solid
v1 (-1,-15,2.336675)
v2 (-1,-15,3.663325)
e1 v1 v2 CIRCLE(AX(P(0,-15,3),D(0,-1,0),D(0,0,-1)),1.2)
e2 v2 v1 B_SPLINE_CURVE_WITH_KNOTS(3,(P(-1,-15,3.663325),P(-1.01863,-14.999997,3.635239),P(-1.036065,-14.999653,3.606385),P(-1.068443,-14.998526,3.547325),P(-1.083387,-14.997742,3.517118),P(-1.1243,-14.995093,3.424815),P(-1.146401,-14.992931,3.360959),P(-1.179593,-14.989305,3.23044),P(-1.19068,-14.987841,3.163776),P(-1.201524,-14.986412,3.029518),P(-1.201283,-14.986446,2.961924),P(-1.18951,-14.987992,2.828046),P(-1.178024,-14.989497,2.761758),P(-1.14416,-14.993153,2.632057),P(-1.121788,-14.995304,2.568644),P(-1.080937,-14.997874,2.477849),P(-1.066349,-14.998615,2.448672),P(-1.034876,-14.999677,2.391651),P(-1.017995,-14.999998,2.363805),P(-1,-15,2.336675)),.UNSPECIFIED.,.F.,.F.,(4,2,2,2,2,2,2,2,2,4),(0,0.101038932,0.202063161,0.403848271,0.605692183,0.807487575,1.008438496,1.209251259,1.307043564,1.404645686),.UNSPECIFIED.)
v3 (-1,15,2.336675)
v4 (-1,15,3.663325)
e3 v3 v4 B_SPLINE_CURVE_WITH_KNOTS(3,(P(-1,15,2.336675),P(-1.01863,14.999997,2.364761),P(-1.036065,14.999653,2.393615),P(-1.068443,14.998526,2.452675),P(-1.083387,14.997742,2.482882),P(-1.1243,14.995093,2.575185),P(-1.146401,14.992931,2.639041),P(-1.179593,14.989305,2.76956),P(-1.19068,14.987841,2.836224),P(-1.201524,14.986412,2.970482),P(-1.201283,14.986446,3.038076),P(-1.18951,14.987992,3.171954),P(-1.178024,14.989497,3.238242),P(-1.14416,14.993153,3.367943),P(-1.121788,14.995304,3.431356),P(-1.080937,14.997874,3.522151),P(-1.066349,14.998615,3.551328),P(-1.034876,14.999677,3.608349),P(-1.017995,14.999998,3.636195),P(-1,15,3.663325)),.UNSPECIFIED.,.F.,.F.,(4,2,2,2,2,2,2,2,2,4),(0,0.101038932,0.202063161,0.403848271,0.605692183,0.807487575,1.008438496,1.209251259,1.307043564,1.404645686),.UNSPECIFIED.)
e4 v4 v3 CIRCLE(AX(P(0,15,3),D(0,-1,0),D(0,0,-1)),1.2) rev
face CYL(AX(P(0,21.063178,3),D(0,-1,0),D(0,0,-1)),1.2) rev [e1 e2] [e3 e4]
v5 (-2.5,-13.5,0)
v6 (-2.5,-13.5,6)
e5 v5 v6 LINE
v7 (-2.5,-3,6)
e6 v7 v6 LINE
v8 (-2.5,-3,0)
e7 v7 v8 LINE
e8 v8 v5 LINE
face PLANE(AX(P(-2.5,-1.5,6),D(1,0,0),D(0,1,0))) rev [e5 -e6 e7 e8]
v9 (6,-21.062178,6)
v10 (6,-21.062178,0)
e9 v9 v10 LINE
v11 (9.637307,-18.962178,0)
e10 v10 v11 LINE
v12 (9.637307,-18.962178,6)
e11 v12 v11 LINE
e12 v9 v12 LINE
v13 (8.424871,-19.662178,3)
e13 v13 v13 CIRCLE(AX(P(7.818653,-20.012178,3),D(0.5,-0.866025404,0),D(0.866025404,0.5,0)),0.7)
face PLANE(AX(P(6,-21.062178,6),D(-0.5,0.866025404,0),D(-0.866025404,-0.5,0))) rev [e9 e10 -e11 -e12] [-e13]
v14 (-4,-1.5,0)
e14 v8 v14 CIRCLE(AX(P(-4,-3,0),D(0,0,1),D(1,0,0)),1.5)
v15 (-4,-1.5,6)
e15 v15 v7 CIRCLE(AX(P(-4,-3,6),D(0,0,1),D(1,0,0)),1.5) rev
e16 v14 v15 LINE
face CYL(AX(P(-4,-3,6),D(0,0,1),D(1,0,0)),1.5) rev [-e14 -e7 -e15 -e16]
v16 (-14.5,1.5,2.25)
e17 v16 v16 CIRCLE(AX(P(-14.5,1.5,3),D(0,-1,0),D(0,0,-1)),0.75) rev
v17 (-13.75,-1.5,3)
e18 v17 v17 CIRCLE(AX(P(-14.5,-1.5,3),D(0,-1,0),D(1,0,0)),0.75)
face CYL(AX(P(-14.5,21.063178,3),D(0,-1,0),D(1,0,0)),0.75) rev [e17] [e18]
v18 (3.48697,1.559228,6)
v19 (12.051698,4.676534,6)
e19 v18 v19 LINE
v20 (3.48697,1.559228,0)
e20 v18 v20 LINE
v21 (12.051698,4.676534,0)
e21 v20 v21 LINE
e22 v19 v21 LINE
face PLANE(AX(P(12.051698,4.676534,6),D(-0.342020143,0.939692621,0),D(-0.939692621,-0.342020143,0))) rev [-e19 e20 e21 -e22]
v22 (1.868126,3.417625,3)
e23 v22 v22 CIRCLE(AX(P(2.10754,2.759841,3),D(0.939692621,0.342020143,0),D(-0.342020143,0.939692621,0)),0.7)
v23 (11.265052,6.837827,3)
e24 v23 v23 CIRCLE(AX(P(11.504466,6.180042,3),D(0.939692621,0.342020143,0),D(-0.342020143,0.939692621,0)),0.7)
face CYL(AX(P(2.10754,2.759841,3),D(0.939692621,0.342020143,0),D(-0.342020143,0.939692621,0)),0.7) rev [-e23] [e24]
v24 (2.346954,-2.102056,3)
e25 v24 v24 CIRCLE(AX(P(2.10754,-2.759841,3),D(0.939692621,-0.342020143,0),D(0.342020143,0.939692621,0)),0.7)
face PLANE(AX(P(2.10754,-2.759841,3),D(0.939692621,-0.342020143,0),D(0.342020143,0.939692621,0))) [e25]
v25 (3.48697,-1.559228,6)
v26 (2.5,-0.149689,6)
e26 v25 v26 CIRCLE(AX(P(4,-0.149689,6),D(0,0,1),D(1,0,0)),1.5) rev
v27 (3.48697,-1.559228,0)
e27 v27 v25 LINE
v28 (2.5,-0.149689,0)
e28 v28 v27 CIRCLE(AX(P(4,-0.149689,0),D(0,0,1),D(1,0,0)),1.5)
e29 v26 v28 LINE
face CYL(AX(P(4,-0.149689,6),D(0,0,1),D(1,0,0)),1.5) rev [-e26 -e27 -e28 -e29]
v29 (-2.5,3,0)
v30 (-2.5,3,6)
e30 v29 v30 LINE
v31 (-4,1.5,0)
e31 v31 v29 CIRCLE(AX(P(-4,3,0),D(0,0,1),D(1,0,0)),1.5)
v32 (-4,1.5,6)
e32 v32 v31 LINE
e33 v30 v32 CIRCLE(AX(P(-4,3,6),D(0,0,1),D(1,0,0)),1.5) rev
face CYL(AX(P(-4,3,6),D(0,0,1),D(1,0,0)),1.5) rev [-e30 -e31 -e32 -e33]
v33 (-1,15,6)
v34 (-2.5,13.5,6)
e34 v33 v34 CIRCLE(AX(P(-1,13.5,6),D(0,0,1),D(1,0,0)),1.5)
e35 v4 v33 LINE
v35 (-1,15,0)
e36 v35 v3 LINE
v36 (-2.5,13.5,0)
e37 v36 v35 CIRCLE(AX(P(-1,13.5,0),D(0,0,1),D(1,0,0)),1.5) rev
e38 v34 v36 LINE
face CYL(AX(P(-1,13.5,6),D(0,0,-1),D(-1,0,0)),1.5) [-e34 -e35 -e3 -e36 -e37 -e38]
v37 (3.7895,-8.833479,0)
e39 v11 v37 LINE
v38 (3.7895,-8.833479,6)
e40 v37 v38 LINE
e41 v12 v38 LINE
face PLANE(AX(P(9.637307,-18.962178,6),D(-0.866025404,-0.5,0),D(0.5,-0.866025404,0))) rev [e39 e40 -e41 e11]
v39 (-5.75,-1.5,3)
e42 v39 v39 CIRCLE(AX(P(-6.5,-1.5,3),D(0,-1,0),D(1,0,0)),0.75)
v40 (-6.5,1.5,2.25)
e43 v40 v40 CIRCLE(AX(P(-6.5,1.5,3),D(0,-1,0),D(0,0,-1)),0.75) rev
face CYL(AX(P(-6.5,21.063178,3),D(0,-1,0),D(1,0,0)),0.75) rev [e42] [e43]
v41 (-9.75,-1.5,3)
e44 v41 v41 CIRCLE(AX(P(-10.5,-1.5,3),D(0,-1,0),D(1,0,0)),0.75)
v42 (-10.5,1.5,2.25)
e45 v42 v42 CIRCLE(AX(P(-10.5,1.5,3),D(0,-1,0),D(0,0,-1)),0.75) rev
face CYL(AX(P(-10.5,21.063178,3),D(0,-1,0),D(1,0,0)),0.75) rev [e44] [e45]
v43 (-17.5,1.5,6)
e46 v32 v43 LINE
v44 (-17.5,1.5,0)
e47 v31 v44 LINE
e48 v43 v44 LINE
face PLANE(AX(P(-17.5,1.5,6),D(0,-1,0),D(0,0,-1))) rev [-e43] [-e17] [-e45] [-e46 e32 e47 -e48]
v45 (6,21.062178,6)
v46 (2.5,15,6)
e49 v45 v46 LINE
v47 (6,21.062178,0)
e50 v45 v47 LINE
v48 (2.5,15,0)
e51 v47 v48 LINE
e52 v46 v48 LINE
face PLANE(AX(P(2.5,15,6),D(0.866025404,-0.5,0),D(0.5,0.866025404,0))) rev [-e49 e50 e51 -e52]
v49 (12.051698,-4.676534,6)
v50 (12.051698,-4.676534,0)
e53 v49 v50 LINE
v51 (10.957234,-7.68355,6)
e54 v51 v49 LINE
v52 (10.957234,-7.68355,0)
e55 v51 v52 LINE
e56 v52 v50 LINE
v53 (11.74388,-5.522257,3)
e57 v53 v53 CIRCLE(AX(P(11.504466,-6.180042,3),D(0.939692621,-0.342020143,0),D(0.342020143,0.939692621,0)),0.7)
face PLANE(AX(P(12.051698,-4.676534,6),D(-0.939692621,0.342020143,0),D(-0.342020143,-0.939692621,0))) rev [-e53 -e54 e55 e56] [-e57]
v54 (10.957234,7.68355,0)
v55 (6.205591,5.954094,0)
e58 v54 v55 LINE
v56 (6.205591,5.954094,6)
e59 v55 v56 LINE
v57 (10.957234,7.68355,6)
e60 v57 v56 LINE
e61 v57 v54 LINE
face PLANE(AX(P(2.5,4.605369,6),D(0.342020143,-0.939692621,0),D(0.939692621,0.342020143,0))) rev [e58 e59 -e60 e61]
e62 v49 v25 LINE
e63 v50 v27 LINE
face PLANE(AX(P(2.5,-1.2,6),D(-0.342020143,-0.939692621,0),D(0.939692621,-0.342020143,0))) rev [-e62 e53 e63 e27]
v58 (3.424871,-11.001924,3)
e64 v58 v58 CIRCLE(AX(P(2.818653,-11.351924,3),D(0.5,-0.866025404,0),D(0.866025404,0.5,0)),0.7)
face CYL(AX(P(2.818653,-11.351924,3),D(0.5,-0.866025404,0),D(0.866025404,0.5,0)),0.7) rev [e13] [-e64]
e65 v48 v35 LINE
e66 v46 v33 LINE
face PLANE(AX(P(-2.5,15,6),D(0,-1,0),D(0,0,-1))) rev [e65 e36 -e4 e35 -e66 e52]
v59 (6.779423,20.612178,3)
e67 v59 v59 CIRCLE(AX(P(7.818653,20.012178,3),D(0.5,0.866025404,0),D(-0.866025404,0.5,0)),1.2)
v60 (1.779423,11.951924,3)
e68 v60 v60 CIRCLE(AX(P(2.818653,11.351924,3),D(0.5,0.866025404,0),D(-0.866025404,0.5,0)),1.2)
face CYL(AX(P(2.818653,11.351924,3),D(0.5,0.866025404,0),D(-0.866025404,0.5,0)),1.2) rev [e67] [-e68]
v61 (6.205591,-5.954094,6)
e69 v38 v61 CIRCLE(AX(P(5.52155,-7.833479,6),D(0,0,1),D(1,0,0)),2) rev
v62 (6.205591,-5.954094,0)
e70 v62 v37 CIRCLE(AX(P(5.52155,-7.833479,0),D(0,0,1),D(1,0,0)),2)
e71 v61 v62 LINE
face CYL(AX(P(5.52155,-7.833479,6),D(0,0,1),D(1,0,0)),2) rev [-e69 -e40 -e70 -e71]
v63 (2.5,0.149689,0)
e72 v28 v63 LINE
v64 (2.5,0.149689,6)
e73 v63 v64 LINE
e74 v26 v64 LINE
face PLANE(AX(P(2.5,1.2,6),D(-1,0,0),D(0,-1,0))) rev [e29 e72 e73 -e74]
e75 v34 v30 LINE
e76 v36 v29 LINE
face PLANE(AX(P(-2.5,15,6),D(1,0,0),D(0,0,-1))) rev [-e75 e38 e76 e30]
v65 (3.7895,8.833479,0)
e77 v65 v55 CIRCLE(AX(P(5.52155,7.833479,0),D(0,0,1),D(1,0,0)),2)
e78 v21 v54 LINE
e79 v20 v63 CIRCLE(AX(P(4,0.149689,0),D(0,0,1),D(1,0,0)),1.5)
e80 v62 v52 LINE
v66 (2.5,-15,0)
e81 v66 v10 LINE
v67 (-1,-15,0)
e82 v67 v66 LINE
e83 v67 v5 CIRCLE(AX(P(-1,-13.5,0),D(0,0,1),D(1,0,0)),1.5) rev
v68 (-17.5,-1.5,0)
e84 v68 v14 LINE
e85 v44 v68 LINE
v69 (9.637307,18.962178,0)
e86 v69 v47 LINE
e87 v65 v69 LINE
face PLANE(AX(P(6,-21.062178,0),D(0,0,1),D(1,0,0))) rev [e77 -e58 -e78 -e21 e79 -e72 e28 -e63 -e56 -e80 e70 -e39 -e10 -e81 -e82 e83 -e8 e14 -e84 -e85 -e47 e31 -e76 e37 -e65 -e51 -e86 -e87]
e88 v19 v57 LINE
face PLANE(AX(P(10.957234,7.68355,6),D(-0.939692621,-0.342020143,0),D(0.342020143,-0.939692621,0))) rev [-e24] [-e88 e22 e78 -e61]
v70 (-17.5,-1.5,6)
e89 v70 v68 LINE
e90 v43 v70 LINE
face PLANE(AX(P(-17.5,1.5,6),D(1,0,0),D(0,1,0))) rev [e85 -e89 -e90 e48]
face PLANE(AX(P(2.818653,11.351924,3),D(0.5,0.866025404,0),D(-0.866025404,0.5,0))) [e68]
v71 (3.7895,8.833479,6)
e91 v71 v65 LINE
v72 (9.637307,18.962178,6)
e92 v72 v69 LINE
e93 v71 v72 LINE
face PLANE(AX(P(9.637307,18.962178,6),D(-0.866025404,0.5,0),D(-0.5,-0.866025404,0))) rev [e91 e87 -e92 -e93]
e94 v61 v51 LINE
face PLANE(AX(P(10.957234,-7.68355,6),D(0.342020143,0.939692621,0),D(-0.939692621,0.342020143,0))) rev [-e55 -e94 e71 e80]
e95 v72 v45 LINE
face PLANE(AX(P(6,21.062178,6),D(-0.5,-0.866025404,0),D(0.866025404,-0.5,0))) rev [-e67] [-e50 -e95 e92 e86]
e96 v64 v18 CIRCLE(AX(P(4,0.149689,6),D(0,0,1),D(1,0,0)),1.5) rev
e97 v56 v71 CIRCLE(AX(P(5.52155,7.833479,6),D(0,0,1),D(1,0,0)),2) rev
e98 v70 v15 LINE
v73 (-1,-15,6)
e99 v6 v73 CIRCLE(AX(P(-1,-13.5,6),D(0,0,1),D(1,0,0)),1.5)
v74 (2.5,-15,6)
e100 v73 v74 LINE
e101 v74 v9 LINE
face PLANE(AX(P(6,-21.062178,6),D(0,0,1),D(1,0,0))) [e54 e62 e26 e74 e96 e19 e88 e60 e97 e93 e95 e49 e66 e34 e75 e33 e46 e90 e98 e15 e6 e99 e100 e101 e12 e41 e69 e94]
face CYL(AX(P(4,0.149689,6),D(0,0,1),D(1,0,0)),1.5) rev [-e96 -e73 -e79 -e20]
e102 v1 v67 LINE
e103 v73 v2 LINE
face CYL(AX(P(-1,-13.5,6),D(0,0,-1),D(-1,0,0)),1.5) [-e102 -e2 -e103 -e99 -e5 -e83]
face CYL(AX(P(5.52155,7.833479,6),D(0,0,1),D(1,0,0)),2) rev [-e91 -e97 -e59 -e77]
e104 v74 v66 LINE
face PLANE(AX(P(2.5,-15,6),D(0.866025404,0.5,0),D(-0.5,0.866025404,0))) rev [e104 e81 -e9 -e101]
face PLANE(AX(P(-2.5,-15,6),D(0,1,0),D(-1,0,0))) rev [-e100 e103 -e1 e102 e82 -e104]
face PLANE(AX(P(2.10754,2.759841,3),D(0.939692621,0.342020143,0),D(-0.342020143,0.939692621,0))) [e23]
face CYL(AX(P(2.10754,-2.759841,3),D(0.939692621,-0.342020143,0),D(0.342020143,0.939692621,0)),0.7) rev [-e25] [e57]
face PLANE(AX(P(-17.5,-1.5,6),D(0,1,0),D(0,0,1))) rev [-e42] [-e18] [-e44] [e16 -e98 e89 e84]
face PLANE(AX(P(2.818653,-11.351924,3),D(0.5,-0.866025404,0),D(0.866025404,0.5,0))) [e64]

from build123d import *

# Parameters (mm, degrees)
EXTRUDE_1_DEPTH      = 6
FILLET_4_R           = 1.5
FILLET_5_R           = 2
SKETCH_7_R           = 1.2
CUT_EXTRUDE_6_DEPTH  = 10
SKETCH_8_R           = 0.7
CUT_EXTRUDE_7_DEPTH  = 10
SKETCH_9_R           = 0.7
CUT_EXTRUDE_8_DEPTH  = 10
SKETCH_10_R          = 0.7
CUT_EXTRUDE_9_DEPTH  = 10
CUT_EXTRUDE_10_REACH = 42.531
SKETCH_11_R          = 1.2
FILLET_6_R           = 1.5
CUT_EXTRUDE_11_REACH = 31.177
SKETCH_12_R          = 0.75


with BuildPart() as part:
    # 草圖1 → 填料-伸長1 (new body)
    with BuildSketch(Plane.XY):
        Polygon((-2.5, 15), (2.5, 15), (6, 21.062177826), (9.637306696, 18.962177826), (2.5, 6.6), (2.5, 4.605368872), (10.957233587, 7.683550162), (12.051698046, 4.676533775), (2.5, 1.2), (2.5, -1.2), (12.051698046, -4.676533775), (10.957233587, -7.683550162), (2.5, -4.605368872), (2.5, -6.6), (9.637306696, -18.962177826), (6, -21.062177826), (2.5, -15), (-2.5, -15), (-2.5, -1.5), (-17.5, -1.5), (-17.5, 1.5), (-2.5, 1.5), align=None)
    extrude(amount=EXTRUDE_1_DEPTH)

    # 圓角4
    # the kernel refuses this fillet: 1.5 mm, written as the material it adds along each edge
    with BuildSketch(Plane(origin=(-2.5, -1.5, 0), x_dir=(0, -1, 0), z_dir=(0, 0, 1)), Plane(origin=(-2.5, 1.5, 0), x_dir=(-1, 0, 0), z_dir=(0, 0, 1))) as fillet_4_piece_1:
        with BuildLine():
            CenterArc((FILLET_4_R, -FILLET_4_R), FILLET_4_R, 90, 90)
            Line((0, -FILLET_4_R), (-FILLET_4_R * 0.02, -FILLET_4_R))
            Line((-FILLET_4_R * 0.02, -FILLET_4_R), (-FILLET_4_R * 0.02, FILLET_4_R * 0.02))
            Line((-FILLET_4_R * 0.02, FILLET_4_R * 0.02), (FILLET_4_R, FILLET_4_R * 0.02))
            Line((FILLET_4_R, FILLET_4_R * 0.02), (FILLET_4_R, 0))
        make_face()
    extrude(amount=6)
    with BuildSketch(Plane(origin=(2.5, 4.605368872, 0), x_dir=(0, 1, 0), z_dir=(0, 0, 1))) as fillet_4_piece_2:
        with BuildLine():
            CenterArc((2.139664035, -1.492972021), FILLET_4_R, 95.548517206, 104.451482794)
            Line((0.730125104, -2.006002236), (0.701934325, -2.01626284))
            Line((0.701934325, -2.01626284), (-0.028190779, -0.010260604))
            Line((-0.028190779, -0.010260604), (0, 0.03))
            ThreePointArc((0, 0.03), (0.997315564, 0.03), (1.99173047, 0.02985944))
            Line((1.99173047, 0.02985944), (1.994631128, 0))
        make_face()
    extrude(amount=6)
    with BuildSketch(Plane(origin=(2.5, 1.2, 0), x_dir=(0.9396926207859073, 0.34202014332567154, 0), z_dir=(0, 0, 1)), Plane(origin=(2.5, -1.2, 0), x_dir=(0, 1, 0), z_dir=(0, 0, 1))) as fillet_4_piece_3:
        with BuildLine():
            CenterArc((FILLET_4_R * 0.70020753821, -FILLET_4_R), FILLET_4_R, 90, 70)
            Line((-FILLET_4_R * 0.239485082576, -FILLET_4_R * 0.657979856674), (-FILLET_4_R * 0.258278934992, -FILLET_4_R * 0.651139453808))
            Line((-FILLET_4_R * 0.258278934992, -FILLET_4_R * 0.651139453808), (-FILLET_4_R * 0.0140041507642, FILLET_4_R * 0.02))
            Line((-FILLET_4_R * 0.0140041507642, FILLET_4_R * 0.02), (FILLET_4_R * 0.70020753821, FILLET_4_R * 0.02))
            Line((FILLET_4_R * 0.70020753821, FILLET_4_R * 0.02), (FILLET_4_R * 0.70020753821, 0))
        make_face()
    extrude(amount=6)
    with BuildSketch(Plane(origin=(2.5, -4.605368872, 0), x_dir=(0.9396926207859109, -0.34202014332566216, 0), z_dir=(0, 0, 1))) as fillet_4_piece_4:
        with BuildLine():
            CenterArc((2.134742991, -1.5), FILLET_4_R, 90, 104.451482794)
            Line((0.682204024, -1.874340152), (0.653153245, -1.881826955))
            ThreePointArc((0.653153245, -1.881826955), (0.312911234, -0.94743068), (-0.028190779, -0.010260604))
            Line((-0.028190779, -0.010260604), (0, 0.03))
            Line((0, 0.03), (2.134742991, 0.03))
            Line((2.134742991, 0.03), (2.134742991, 0))
        make_face()
    extrude(amount=6)

    # 圓角5
    fillet_5_edges = [part.edges().sort_by_distance(p)[0] for p in [
        (2.5, -6.6, 3),
        (2.5, 6.6, 3),
    ]]
    fillet(fillet_5_edges, radius=FILLET_5_R)

    # 草圖7 → 除料-伸長6 (cut)
    with BuildSketch(Plane(origin=(10.620190528, 18.394709581, 0), x_dir=(0.8660254037844364, -0.5000000000000041, 0), z_dir=(0.5000000000000041, 0.8660254037844364, 0))):
        with Locations(Location((-3.234936491, -3, 0), (0, 0, 180))):
            Circle(SKETCH_7_R)
    extrude(amount=-CUT_EXTRUDE_6_DEPTH, mode=Mode.SUBTRACT)

    # 草圖8 → 除料-伸長7 (cut)
    with BuildSketch(Plane(origin=(10.620190528, -18.394709581, 0), x_dir=(0.8660254037844356, 0.5000000000000054, 0), z_dir=(0.5000000000000054, -0.8660254037844356, 0))):
        with Locations((-3.234936491, 3)):
            Circle(SKETCH_8_R)
    extrude(amount=-CUT_EXTRUDE_7_DEPTH, mode=Mode.SUBTRACT)

    # 草圖9 → 除料-伸長8 (cut)
    with BuildSketch(Plane(origin=(12.144926165, -4.420391622, 0), x_dir=(0, 0, -1), z_dir=(0.9396926207859106, -0.3420201433256625, 0))):
        with Locations(Location((-3, -1.872580787, 0), (0, 0, 90))):
            Circle(SKETCH_9_R)
    extrude(amount=-CUT_EXTRUDE_8_DEPTH, mode=Mode.SUBTRACT)

    # 草圖10 → 除料-伸長9 (cut)
    with BuildSketch(Plane(origin=(12.144926165, 4.420391622, 0), x_dir=(0, 0, -1), z_dir=(0.9396926207859082, 0.3420201433256692, 0))):
        with Locations(Location((-3, 1.872580787, 0), (0, 0, 90))):
            Circle(SKETCH_10_R)
    extrude(amount=-CUT_EXTRUDE_9_DEPTH, mode=Mode.SUBTRACT)

    # 草圖11 → 除料-伸長10 (cut, up to next)
    with BuildSketch(Plane.XZ.offset(15), mode=Mode.PRIVATE) as cut_extrude_10_sk1:
        with Locations(Location((0, 3, 0), (0, 0, 270))):
            Circle(SKETCH_11_R)
    cut_extrude_10_tool1 = extrude(cut_extrude_10_sk1.sketch, amount=-CUT_EXTRUDE_10_REACH, mode=Mode.PRIVATE) & part.part
    add(cut_extrude_10_tool1.solids().sort_by_distance((0, -15, 3))[0], mode=Mode.SUBTRACT)

    # 圓角6
    # the kernel refuses this fillet: 1.5 mm, written as the material it takes off along each edge
    with BuildSketch(Plane(origin=(-2.5, -15, -3.75), x_dir=(1, 0, 0), z_dir=(0, 0, 1)), Plane(origin=(-2.5, 15, -3.75), x_dir=(0, -1, 0), z_dir=(0, 0, 1))) as fillet_6_piece_1:
        with BuildLine():
            CenterArc((FILLET_6_R, FILLET_6_R), FILLET_6_R, 180, 90)
            Line((0, FILLET_6_R), (0, 0))
            Line((0, 0), (FILLET_6_R, 0))
        make_face()
    extrude(amount=13.5, mode=Mode.SUBTRACT)

    # 草圖12 → 除料-伸長11 (cut, up to next)
    with BuildSketch(Plane.XZ.offset(1.5), mode=Mode.PRIVATE) as cut_extrude_11_sk1:
        with Locations((-6.5, 3)):
            Circle(SKETCH_12_R)
    cut_extrude_11_tool1 = extrude(cut_extrude_11_sk1.sketch, amount=-CUT_EXTRUDE_11_REACH, mode=Mode.PRIVATE) & part.part
    # 草圖12 → 除料-伸長11 (cut, up to next)
    with BuildSketch(Plane.XZ.offset(1.5), mode=Mode.PRIVATE) as cut_extrude_11_sk2:
        with Locations((-10.5, 3)):
            Circle(SKETCH_12_R)
    cut_extrude_11_tool2 = extrude(cut_extrude_11_sk2.sketch, amount=-CUT_EXTRUDE_11_REACH, mode=Mode.PRIVATE) & part.part
    # 草圖12 → 除料-伸長11 (cut, up to next)
    with BuildSketch(Plane.XZ.offset(1.5), mode=Mode.PRIVATE) as cut_extrude_11_sk3:
        with Locations((-14.5, 3)):
            Circle(SKETCH_12_R)
    cut_extrude_11_tool3 = extrude(cut_extrude_11_sk3.sketch, amount=-CUT_EXTRUDE_11_REACH, mode=Mode.PRIVATE) & part.part
    add(cut_extrude_11_tool1.solids().sort_by_distance((-6.5, -1.5, 3))[0], mode=Mode.SUBTRACT)
    add(cut_extrude_11_tool2.solids().sort_by_distance((-10.5, -1.5, 3))[0], mode=Mode.SUBTRACT)
    add(cut_extrude_11_tool3.solids().sort_by_distance((-14.5, -1.5, 3))[0], mode=Mode.SUBTRACT)


solid = part.part
